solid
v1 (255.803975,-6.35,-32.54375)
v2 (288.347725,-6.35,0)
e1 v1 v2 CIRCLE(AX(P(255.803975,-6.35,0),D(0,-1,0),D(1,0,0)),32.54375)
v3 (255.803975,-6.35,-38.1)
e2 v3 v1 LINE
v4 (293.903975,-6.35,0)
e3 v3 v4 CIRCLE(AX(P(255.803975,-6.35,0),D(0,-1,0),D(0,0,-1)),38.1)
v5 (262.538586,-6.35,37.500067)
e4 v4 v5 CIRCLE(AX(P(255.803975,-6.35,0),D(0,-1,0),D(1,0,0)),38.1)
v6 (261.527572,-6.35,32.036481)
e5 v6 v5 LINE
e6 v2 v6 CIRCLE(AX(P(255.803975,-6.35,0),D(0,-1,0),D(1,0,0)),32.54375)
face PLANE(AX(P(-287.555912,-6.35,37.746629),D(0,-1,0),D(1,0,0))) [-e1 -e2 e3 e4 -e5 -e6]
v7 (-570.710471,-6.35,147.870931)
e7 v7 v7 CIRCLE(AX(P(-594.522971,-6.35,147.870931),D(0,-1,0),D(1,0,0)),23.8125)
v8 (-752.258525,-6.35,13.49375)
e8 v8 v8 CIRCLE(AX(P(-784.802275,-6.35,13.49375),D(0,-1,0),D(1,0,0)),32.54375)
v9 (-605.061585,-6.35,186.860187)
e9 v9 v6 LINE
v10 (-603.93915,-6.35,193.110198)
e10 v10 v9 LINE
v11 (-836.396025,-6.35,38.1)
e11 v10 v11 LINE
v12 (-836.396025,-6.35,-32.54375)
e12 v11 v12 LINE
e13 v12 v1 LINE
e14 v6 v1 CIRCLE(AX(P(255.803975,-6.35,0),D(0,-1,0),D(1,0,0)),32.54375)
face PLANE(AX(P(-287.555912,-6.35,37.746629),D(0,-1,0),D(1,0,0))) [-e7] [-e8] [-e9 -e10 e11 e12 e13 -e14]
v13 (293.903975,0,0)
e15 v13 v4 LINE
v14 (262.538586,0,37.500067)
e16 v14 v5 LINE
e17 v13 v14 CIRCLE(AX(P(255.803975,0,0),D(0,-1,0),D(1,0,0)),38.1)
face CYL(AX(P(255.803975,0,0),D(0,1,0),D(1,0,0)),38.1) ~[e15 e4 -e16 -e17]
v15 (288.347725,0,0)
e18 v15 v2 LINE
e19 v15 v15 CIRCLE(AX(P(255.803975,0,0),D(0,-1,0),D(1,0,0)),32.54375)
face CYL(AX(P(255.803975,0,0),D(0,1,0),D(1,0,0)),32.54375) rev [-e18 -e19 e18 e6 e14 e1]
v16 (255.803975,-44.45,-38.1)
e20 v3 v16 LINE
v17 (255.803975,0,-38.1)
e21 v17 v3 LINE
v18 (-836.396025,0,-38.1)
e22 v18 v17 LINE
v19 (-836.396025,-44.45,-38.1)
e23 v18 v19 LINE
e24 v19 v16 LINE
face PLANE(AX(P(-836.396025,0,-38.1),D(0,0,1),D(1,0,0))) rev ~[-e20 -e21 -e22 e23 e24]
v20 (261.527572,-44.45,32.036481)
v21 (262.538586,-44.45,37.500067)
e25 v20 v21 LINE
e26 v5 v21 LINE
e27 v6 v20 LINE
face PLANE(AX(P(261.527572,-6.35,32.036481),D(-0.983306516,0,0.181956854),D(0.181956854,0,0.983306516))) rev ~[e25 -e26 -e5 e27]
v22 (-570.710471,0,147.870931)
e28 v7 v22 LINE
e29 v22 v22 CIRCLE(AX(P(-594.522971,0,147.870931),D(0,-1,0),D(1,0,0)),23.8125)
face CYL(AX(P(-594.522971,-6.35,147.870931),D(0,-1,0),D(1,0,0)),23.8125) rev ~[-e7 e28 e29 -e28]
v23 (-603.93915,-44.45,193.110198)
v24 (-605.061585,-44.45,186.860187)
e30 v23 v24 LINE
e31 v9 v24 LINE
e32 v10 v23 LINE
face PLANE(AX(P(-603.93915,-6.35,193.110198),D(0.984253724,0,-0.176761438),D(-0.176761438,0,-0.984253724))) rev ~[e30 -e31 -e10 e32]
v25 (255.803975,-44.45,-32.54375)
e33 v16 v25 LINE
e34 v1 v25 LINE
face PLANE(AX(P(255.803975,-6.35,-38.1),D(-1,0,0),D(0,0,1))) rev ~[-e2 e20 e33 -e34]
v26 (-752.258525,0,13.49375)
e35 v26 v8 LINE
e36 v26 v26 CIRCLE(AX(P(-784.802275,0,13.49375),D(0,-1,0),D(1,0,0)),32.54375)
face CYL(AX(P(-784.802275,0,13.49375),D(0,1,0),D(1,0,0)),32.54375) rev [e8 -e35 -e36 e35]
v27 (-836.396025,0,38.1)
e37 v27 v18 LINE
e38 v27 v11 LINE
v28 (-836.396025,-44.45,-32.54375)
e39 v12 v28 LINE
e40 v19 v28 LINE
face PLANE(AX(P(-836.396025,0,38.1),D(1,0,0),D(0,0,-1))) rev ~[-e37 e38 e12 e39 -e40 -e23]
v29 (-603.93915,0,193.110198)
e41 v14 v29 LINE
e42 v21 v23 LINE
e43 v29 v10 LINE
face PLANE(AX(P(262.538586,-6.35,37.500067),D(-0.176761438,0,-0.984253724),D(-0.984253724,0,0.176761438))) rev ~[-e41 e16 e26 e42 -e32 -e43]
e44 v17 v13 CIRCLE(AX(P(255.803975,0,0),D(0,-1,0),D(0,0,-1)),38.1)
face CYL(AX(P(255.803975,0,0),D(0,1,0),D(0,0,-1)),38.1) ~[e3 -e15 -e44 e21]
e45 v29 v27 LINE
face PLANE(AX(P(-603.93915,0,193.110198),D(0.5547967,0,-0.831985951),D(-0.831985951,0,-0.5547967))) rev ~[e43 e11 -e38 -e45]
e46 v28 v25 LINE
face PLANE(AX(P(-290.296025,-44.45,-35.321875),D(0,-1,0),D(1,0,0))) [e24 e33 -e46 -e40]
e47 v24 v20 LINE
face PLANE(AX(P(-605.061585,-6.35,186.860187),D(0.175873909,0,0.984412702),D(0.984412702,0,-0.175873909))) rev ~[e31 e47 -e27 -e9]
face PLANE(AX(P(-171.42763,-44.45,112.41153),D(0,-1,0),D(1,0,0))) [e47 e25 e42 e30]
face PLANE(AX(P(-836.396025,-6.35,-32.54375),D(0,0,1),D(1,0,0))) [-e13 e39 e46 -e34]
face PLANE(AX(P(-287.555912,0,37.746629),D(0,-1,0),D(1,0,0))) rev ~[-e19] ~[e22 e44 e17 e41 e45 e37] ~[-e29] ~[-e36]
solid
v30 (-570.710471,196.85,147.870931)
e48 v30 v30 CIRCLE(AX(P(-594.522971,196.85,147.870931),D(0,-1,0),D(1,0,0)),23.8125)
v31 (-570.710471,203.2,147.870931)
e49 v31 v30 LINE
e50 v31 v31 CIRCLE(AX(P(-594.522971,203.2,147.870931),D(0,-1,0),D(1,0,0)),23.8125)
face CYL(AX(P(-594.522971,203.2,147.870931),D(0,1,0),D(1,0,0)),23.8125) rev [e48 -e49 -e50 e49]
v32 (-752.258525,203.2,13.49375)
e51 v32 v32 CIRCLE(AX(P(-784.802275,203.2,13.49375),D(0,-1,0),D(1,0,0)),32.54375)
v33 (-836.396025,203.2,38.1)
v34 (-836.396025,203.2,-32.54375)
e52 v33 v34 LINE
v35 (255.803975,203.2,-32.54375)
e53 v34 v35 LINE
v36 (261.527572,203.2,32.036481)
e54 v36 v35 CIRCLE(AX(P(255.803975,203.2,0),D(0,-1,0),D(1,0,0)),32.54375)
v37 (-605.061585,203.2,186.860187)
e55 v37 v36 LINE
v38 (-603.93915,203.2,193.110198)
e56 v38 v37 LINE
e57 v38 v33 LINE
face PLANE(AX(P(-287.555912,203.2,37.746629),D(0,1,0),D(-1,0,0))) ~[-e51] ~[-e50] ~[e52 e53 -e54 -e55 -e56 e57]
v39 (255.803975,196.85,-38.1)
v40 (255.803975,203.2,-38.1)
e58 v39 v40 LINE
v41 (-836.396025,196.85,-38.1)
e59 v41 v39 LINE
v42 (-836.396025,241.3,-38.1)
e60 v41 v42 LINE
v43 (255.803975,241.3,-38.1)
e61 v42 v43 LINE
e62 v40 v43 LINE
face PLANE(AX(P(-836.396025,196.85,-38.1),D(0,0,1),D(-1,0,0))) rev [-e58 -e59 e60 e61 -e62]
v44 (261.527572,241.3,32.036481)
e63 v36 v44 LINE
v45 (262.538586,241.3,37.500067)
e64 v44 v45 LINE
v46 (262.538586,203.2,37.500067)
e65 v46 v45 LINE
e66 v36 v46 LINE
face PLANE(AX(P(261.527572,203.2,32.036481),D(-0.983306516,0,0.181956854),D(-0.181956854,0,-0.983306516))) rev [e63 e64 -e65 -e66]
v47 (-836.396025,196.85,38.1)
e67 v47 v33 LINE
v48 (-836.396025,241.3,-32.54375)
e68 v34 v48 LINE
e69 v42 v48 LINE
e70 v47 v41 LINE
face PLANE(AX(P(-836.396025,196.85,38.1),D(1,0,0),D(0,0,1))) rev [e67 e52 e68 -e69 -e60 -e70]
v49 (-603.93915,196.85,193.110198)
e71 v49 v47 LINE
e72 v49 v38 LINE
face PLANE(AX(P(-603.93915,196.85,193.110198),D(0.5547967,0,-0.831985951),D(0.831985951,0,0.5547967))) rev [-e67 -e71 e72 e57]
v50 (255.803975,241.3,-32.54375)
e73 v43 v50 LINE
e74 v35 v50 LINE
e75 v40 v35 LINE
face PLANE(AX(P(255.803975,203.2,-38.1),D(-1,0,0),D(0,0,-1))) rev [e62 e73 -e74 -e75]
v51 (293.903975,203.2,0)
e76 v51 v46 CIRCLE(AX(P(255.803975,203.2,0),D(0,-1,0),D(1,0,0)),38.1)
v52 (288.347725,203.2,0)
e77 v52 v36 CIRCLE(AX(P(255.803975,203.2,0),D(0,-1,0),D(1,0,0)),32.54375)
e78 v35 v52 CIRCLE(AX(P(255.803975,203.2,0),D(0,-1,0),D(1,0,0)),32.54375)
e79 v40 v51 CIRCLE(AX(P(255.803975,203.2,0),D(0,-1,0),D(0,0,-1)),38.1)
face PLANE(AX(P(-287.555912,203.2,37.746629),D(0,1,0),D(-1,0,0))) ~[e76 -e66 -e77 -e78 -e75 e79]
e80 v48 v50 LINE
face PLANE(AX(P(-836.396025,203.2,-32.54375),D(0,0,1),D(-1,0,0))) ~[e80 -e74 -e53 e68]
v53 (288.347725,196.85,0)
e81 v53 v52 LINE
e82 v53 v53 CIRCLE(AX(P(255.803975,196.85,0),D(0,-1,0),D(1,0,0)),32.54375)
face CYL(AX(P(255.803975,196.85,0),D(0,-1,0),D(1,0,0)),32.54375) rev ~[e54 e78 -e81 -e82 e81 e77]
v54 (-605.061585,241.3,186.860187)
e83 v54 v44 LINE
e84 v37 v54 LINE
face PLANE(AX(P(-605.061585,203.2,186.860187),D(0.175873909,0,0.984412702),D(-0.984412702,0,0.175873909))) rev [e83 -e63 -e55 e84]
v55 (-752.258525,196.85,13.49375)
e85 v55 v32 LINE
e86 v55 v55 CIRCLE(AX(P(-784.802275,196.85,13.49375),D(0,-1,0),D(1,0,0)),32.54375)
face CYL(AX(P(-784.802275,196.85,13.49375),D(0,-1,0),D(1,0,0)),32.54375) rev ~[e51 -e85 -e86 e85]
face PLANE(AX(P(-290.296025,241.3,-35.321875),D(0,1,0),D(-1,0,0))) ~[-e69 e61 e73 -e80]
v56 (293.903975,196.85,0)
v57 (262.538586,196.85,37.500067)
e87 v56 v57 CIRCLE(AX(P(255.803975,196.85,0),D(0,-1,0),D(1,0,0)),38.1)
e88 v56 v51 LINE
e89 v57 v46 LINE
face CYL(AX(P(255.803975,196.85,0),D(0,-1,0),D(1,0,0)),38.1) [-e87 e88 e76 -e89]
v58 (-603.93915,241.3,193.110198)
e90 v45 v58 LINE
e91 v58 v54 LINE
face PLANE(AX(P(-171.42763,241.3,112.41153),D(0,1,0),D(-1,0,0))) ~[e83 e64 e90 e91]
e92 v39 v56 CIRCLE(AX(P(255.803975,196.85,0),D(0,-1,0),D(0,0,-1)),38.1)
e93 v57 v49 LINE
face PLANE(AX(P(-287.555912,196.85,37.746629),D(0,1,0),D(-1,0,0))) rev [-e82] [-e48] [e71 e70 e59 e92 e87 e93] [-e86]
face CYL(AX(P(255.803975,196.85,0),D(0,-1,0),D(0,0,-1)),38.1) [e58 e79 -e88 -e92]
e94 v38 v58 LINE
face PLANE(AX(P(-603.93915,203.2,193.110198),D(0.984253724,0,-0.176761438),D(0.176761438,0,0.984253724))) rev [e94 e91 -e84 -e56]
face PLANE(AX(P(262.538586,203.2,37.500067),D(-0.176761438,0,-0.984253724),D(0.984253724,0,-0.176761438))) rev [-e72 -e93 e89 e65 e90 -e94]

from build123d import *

# Parameters (mm, degrees)
F0_R          = 32.54375
F1_DEPTH      = 6.35
F2_R          = 23.8125
F2_W          = 1092.2
F2_H          = 5.55625
F3_DEPTH      = 38.1
F4_DEPTH      = 25.4
F4_DEPTH_BACK = 76.2


with BuildPart() as f1:
    # F0 (on Front) → F1 (new body)
    with BuildSketch(Plane.XZ):
        with BuildLine():
            ThreePointArc((255.8039750737, -38.1), (217.8542547268, 3.3806398206), (262.538585876, 37.5000668978))
            Line((262.538585876, 37.5000668978), (-603.9391503229, 193.1101978891))
            Line((-603.9391503229, 193.1101978891), (-836.3960249263, 38.1))
            Line((-836.3960249263, 38.1), (-836.3960249263, -38.1))
            Line((-836.3960249263, -38.1), (255.8039750737, -38.1))
        make_face()
        with Locations((-784.8022749263, 13.49375)):
            Circle(F0_R, mode=Mode.SUBTRACT)
        with BuildLine():
            ThreePointArc((255.8039750737, -38.1), (282.7447434369, -26.9407683632), (293.9039750737, 0))
            ThreePointArc((293.9039750737, 0), (285.0289530169, 24.4440312595), (262.538585876, 37.5000668978))
            ThreePointArc((262.538585876, 37.5000668978), (217.8542547268, 3.3806398206), (255.8039750737, -38.1))
        make_face()
        with Locations((255.8039750737, 0)):
            Circle(F0_R, mode=Mode.SUBTRACT)
    extrude(amount=F1_DEPTH)

    # F2 (on face) → F3 (join)
    with BuildSketch(Plane.XZ.offset(6.35)):
        with Locations((-594.5229711201, 147.8709305353)):
            Circle(F2_R)
        Polygon((262.538585876, 37.5000668978), (-603.9391503229, 193.1101978891), (-605.0615854567, 186.8601867395), (261.5275716032, 32.0364808746), align=None)
        with Locations((-290.2960249263, -35.321875)):
            Rectangle(F2_W, F2_H)
    extrude(amount=F3_DEPTH)

    # F2 (on face) → F4 (cut, two sides)
    with BuildSketch(Plane.XZ.offset(6.35)) as f4_sk:
        with Locations((-594.5229711201, 147.8709305353)):
            Circle(F2_R)
    extrude(amount=-F4_DEPTH, mode=Mode.SUBTRACT)
    extrude(f4_sk.sketch, amount=F4_DEPTH_BACK, mode=Mode.SUBTRACT)


with BuildPart() as f6_1:
    # F6: instance of F1
    add(f1.part.mirror(Plane(origin=(-334.3061956404, 98.425, 45.1552498407), x_dir=(1, 0, 0), z_dir=(0, 1, 0))))


solid = Compound([f1.part, f6_1.part])
